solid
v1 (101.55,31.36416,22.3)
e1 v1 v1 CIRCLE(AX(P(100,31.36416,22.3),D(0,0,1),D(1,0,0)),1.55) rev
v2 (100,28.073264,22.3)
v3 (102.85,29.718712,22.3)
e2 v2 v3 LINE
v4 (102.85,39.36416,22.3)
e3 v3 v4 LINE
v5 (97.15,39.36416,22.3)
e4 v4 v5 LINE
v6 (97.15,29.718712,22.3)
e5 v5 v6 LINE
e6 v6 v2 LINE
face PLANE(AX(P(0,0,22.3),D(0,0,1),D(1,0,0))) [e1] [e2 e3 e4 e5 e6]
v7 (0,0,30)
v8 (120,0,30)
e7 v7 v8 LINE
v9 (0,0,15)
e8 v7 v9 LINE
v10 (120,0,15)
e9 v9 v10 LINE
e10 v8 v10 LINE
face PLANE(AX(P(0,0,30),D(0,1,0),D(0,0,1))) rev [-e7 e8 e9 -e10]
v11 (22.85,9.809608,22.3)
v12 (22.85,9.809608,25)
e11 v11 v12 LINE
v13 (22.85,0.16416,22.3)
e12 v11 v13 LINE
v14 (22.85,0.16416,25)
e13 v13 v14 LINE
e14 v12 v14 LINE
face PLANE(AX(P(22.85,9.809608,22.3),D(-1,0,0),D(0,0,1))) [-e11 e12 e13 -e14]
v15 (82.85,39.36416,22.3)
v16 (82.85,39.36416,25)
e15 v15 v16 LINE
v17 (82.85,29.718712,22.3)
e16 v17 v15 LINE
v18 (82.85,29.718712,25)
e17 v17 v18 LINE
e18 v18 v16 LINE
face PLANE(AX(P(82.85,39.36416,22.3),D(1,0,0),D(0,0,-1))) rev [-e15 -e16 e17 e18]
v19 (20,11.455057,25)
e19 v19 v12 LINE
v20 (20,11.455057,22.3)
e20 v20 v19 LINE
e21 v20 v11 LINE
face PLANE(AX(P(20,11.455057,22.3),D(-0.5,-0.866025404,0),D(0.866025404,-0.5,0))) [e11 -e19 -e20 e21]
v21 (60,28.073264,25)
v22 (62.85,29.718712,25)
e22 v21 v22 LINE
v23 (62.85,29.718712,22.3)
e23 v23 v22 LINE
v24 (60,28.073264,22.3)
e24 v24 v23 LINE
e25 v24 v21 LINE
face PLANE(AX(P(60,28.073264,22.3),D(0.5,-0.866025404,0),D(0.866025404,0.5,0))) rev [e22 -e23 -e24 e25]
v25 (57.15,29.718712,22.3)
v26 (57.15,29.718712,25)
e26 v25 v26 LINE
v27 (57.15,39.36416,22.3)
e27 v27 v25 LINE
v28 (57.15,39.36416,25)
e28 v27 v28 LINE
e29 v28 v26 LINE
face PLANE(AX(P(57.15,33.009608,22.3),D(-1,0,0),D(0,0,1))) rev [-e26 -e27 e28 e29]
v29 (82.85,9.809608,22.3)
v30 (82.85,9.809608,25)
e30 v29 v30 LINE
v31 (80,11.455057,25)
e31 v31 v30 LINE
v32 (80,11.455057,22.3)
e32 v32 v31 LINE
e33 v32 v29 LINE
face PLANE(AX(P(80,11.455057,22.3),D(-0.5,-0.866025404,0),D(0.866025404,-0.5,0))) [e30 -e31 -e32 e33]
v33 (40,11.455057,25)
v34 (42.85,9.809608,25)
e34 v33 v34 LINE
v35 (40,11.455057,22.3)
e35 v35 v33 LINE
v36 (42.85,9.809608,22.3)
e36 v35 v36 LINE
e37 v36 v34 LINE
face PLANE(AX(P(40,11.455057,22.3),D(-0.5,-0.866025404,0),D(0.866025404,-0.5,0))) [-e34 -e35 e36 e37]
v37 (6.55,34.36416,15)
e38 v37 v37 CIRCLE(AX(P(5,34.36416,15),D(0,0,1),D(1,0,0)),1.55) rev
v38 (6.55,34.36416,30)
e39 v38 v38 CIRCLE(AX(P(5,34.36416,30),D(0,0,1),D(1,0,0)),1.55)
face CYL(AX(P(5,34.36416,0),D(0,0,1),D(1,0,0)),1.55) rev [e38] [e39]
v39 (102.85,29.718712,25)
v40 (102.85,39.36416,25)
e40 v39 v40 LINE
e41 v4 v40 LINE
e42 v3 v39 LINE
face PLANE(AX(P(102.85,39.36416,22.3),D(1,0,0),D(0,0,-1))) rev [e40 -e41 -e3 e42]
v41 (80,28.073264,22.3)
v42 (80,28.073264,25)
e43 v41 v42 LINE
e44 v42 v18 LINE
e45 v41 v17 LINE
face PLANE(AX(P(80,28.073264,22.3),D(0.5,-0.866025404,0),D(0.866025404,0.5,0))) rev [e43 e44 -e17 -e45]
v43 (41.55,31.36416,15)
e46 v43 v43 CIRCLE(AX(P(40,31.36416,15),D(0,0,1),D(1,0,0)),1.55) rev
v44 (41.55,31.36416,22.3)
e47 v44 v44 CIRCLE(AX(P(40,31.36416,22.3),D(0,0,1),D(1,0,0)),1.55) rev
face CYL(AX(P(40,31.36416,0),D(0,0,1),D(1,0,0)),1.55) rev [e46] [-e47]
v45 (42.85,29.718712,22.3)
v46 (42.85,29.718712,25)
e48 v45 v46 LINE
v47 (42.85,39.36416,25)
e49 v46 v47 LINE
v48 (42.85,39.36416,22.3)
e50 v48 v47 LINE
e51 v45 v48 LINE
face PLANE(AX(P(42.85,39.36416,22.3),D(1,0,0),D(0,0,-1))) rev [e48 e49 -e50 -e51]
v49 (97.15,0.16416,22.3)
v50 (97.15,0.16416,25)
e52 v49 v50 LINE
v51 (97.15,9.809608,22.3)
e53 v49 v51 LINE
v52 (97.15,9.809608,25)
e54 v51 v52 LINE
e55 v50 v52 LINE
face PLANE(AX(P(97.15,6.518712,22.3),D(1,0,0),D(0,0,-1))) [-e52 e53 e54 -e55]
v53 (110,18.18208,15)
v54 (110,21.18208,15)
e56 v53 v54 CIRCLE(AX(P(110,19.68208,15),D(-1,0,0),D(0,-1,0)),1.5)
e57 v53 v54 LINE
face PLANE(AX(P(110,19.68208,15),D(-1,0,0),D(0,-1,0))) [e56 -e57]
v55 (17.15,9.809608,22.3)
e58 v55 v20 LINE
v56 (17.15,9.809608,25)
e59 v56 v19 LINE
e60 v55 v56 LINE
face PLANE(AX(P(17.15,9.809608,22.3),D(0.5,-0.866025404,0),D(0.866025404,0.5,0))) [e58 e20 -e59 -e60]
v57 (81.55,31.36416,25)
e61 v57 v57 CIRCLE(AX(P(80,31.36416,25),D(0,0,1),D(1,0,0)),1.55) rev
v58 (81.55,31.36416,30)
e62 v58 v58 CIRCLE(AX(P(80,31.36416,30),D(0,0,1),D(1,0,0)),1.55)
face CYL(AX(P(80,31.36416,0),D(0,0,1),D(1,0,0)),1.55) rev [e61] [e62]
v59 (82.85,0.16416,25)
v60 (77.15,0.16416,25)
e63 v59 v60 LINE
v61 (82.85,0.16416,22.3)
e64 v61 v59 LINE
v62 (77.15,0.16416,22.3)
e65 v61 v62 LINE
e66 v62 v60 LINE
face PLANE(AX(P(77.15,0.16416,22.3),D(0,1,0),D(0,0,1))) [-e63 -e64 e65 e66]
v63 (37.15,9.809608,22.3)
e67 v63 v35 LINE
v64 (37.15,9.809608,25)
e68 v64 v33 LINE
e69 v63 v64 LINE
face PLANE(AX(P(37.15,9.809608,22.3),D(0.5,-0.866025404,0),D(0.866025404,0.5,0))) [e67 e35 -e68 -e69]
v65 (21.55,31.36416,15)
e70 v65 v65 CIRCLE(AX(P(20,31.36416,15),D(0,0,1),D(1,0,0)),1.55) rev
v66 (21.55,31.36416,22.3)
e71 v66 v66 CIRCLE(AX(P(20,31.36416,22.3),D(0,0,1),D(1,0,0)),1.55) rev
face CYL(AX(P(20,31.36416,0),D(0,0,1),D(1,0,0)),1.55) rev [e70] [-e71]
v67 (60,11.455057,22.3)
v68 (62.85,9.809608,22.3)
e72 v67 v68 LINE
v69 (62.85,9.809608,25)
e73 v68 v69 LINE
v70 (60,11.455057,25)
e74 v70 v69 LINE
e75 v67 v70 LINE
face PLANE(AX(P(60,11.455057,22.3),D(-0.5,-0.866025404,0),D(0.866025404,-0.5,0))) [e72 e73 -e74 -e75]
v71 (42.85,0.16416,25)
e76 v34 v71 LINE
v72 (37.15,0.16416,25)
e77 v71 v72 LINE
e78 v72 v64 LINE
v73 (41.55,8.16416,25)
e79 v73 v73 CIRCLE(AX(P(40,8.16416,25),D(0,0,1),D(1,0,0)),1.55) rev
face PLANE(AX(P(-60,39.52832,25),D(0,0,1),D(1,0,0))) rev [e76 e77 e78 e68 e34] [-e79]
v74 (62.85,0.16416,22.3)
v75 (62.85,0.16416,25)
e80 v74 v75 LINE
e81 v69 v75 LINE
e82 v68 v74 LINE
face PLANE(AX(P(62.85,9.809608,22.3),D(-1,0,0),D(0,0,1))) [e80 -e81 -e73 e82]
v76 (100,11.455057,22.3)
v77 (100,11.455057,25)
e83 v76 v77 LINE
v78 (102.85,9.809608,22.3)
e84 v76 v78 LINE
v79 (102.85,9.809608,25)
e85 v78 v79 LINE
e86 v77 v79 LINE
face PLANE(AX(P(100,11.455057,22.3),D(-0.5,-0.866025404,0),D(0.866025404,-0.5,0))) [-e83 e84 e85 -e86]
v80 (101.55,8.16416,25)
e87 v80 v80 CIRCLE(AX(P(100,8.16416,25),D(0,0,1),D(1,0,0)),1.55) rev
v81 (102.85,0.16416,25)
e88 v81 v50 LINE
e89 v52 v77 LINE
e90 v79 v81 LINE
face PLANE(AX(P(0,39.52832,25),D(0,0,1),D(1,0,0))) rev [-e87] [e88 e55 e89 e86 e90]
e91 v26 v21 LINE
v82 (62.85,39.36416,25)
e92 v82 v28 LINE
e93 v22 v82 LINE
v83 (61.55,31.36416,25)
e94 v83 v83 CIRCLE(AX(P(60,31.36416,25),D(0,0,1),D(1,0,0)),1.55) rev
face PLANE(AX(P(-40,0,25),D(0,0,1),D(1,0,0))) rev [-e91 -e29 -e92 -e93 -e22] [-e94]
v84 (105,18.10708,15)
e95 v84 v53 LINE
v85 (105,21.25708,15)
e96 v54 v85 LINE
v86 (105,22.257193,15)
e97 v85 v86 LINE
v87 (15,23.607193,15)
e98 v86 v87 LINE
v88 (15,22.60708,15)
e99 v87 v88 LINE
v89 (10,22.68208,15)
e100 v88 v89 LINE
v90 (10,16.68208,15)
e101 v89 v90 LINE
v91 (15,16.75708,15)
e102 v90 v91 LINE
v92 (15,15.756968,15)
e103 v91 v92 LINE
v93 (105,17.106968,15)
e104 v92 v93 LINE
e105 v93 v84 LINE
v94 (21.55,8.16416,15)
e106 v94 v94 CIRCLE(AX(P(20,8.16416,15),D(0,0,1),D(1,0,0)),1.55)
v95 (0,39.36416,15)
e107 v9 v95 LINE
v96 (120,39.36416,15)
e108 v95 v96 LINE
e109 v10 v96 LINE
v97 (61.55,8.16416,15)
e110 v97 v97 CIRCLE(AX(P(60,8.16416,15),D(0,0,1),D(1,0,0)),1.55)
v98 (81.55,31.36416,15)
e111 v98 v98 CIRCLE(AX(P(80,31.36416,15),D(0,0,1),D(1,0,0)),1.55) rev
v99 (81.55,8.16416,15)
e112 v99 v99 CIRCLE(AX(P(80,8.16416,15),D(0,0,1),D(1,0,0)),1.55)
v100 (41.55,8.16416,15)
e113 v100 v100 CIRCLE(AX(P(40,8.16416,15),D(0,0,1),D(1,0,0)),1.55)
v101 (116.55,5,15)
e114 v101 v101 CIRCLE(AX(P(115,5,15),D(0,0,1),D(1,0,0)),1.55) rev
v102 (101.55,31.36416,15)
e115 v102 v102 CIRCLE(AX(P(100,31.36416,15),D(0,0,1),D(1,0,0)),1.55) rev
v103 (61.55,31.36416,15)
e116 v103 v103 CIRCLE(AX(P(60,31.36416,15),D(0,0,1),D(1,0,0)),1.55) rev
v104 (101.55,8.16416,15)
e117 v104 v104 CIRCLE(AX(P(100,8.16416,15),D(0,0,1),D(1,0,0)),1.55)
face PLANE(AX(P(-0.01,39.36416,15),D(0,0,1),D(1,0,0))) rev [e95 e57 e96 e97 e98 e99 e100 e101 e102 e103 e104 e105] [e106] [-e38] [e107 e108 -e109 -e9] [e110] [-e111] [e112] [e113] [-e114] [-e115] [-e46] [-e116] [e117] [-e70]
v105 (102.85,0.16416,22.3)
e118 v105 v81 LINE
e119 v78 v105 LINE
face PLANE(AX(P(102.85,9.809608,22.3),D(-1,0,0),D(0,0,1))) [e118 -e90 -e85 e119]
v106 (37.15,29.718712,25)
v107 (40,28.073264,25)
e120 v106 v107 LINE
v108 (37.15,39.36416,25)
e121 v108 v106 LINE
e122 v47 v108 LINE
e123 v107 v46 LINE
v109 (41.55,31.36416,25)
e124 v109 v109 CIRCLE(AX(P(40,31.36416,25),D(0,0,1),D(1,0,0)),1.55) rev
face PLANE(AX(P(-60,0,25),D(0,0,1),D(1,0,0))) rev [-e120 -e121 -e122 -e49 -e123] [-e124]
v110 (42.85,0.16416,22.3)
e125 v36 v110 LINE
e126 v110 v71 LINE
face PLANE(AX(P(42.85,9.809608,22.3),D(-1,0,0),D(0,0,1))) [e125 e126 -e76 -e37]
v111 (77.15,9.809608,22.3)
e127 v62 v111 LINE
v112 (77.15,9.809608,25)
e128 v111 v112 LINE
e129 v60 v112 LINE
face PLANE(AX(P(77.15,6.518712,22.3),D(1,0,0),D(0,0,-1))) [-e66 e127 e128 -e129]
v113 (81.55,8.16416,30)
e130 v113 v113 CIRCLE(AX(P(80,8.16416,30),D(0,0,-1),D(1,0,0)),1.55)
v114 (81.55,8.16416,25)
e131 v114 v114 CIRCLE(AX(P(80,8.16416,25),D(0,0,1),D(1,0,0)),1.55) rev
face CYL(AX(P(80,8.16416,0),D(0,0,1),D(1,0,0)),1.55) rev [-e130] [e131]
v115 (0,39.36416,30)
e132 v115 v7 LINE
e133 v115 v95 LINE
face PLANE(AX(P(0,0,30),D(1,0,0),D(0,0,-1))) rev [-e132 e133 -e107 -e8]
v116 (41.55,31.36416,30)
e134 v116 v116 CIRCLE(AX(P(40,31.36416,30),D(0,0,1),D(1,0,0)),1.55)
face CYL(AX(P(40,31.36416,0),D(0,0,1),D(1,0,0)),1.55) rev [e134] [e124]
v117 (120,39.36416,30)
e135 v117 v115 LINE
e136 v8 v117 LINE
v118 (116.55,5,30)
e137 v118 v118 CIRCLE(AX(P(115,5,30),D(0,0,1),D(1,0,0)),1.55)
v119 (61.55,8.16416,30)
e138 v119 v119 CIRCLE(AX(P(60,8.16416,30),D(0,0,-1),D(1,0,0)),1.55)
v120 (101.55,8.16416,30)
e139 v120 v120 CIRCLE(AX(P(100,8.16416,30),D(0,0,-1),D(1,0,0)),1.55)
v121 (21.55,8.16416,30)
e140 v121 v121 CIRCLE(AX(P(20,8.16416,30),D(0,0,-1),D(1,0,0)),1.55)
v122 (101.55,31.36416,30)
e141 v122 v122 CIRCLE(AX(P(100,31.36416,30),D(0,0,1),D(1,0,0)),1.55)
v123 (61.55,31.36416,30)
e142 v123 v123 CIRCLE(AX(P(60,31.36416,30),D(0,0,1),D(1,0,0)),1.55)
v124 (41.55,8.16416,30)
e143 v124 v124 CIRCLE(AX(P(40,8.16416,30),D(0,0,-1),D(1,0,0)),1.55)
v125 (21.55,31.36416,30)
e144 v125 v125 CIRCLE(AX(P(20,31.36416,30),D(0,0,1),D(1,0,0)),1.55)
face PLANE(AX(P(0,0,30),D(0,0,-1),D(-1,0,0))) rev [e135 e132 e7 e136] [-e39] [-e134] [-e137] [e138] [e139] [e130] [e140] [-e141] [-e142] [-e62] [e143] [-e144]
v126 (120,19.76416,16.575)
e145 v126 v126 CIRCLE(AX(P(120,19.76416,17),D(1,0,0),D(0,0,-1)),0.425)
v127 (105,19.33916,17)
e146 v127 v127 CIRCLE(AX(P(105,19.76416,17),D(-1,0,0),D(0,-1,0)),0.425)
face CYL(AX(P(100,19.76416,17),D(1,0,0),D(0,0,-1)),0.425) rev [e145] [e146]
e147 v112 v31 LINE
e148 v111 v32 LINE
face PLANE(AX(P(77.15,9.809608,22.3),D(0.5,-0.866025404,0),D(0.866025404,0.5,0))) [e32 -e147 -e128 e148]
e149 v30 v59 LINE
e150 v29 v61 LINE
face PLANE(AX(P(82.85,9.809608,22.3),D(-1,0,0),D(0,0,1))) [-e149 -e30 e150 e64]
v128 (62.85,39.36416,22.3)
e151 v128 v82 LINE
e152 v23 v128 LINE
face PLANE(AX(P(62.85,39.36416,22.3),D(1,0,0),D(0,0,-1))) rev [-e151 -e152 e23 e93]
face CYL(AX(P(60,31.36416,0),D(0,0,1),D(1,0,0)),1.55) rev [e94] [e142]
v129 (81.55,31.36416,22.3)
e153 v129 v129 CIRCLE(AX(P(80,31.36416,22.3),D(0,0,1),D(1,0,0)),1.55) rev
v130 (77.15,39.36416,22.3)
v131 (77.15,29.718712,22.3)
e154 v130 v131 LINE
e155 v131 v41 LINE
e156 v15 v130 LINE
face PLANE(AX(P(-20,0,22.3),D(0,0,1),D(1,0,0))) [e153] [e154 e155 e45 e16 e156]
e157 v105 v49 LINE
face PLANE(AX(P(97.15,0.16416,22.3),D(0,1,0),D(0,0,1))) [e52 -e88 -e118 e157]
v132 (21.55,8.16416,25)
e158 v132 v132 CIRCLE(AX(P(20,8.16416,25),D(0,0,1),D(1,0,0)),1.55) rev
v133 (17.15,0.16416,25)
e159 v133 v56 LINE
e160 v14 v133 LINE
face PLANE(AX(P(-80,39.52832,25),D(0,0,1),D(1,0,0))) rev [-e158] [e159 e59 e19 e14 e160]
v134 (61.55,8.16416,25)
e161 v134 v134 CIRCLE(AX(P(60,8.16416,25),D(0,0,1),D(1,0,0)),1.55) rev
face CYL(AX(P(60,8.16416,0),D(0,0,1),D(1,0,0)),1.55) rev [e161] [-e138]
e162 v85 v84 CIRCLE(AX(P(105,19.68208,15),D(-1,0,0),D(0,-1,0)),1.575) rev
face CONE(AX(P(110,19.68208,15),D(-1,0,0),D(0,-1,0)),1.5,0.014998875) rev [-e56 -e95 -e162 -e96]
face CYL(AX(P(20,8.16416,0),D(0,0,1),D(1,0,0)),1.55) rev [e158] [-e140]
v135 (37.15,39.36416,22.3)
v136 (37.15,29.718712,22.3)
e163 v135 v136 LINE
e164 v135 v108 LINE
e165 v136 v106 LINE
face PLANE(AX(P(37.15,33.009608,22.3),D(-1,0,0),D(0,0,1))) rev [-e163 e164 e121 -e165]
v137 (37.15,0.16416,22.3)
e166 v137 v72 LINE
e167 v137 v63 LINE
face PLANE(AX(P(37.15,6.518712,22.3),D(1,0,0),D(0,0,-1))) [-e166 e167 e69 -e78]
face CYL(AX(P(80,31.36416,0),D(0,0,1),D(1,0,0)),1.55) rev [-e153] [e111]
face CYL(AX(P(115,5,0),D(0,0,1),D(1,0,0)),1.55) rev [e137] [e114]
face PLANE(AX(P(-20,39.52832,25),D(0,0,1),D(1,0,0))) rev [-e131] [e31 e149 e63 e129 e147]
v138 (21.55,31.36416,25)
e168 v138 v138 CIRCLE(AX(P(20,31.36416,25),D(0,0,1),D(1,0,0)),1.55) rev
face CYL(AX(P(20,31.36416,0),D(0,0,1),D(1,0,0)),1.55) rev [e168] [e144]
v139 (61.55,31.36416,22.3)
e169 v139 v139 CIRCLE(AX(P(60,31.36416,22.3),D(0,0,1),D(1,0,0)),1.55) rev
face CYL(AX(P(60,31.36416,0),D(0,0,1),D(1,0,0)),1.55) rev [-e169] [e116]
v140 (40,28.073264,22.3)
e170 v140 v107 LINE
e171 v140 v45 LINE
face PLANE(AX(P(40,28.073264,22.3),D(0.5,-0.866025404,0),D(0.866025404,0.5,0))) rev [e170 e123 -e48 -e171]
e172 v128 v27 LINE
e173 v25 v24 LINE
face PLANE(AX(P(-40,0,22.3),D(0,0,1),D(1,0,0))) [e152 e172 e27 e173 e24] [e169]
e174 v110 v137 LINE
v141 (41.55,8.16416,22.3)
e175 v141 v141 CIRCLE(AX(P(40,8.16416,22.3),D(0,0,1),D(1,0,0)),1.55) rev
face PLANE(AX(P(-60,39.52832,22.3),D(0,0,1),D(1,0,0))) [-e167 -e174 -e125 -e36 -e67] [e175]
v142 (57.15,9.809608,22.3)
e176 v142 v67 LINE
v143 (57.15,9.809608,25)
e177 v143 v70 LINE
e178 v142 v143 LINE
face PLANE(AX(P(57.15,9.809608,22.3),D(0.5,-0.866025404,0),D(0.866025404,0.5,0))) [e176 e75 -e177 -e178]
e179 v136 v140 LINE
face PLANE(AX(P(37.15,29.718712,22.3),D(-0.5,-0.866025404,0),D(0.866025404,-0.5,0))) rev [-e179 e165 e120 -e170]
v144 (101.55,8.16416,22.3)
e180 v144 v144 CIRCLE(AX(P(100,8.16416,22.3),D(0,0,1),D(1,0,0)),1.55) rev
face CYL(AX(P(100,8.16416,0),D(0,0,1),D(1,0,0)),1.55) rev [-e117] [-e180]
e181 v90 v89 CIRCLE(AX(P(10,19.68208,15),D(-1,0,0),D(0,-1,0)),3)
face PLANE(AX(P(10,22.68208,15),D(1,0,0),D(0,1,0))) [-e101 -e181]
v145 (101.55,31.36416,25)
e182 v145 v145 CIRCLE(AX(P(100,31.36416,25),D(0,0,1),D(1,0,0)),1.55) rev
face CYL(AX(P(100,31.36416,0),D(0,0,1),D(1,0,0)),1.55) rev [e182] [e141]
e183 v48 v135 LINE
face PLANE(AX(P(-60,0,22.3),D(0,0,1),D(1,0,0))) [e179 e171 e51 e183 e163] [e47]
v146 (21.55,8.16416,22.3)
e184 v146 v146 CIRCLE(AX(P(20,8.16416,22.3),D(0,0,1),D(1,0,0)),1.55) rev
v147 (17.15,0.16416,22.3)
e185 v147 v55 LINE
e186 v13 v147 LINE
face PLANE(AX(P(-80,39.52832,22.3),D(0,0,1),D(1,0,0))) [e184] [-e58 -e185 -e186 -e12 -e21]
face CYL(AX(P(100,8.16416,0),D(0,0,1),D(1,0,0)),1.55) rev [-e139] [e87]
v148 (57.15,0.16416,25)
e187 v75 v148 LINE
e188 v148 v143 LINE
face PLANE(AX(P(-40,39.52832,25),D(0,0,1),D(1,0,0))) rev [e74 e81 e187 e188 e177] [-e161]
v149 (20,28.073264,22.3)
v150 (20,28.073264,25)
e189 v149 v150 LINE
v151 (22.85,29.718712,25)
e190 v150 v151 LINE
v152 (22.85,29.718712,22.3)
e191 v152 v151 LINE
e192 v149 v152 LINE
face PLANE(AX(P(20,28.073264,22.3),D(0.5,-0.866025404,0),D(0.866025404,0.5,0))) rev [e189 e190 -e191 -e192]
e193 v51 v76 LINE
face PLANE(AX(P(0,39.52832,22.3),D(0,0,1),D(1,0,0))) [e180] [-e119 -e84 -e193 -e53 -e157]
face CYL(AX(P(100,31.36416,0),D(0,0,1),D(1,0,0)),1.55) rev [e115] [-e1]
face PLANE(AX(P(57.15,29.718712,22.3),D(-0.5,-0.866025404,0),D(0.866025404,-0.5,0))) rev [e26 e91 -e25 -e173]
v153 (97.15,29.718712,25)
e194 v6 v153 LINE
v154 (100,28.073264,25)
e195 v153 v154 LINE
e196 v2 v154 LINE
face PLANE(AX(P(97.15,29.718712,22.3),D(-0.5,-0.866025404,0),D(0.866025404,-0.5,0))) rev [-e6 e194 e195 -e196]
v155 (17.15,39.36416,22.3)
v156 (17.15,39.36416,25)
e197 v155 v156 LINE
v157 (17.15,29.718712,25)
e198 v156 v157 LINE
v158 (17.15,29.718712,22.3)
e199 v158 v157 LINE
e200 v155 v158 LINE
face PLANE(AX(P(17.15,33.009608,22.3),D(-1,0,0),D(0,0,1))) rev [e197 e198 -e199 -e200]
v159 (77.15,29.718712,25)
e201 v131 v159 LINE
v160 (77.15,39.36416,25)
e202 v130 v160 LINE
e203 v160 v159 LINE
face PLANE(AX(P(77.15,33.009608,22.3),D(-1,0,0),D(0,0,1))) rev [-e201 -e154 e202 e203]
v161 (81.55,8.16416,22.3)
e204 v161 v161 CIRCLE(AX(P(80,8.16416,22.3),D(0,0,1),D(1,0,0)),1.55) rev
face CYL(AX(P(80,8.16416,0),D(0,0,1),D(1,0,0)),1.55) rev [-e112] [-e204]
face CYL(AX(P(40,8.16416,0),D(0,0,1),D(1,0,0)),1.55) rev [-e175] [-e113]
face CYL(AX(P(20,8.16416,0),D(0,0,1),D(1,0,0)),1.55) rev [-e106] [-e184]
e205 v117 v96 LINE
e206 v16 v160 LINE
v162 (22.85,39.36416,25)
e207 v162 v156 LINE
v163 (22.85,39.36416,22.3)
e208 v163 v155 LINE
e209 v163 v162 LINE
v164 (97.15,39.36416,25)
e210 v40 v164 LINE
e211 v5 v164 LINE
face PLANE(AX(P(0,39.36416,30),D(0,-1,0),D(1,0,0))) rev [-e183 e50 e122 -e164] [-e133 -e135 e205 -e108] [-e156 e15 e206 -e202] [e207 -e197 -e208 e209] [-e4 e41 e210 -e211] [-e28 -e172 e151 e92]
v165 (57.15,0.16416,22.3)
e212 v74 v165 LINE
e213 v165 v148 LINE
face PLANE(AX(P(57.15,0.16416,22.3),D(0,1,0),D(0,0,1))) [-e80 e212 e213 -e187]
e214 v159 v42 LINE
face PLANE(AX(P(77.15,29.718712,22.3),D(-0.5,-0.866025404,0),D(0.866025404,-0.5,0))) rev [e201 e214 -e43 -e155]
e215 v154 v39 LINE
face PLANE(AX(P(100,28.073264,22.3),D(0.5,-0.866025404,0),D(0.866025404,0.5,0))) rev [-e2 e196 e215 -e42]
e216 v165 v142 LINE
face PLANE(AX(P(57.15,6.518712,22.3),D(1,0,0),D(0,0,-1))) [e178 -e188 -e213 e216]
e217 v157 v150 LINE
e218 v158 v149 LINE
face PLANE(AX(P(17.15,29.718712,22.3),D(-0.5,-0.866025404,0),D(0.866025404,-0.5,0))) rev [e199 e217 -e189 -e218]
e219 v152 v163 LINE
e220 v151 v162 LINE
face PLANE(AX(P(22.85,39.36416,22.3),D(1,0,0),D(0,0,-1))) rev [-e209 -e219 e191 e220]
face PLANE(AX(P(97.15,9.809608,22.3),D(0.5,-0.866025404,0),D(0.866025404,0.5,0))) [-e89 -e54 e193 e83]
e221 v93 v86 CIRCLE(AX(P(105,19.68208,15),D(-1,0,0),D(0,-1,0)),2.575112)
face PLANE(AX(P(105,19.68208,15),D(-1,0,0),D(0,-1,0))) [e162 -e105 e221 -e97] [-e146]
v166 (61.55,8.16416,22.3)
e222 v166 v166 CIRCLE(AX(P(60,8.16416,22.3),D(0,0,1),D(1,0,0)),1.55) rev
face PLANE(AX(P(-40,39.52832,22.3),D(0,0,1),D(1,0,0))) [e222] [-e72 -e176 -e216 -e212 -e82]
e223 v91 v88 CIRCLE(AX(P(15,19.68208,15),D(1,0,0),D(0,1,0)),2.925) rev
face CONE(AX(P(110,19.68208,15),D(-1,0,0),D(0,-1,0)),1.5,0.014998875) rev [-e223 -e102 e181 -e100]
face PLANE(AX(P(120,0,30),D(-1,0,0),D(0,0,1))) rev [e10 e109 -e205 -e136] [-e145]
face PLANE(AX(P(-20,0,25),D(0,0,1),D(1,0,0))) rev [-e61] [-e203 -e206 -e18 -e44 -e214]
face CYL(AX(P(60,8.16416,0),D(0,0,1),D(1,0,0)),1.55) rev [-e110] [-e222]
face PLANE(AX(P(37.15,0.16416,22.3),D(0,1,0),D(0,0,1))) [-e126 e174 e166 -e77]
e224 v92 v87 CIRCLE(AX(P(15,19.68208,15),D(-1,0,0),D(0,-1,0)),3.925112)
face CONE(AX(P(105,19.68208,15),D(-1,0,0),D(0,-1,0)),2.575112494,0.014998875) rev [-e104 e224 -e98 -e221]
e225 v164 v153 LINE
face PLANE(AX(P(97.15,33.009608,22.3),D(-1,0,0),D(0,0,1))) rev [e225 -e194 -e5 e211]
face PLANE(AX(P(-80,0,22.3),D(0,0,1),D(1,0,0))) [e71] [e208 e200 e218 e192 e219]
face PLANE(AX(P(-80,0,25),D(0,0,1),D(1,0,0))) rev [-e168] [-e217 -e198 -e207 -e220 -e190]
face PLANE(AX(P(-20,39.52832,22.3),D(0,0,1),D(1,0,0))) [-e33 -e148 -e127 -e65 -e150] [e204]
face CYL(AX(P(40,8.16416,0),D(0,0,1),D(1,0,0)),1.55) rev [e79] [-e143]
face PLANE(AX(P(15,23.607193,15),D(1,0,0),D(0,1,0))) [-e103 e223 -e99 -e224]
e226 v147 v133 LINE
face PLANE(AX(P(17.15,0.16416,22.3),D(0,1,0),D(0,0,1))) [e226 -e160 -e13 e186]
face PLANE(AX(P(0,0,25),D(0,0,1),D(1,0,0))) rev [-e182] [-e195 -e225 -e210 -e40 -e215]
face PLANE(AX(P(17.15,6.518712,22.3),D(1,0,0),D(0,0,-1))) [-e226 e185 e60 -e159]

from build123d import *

# Parameters (mm, degrees)
SKIZZE2_W                        = 120
SKIZZE2_H                        = 39.364160046
AUFSATZ_LINEAR_AUSTRAGEN1_DEPTH  = 30
SKIZZE24_R                       = 1.55
SCHNITT_LINEAR_AUSTRAGEN4_DEPTH  = 130.805766806
SKIZZE46_R                       = 2.85
SCHNITT_LINEAR_AUSTRAGEN15_DEPTH = 10
SCHNITT_LINEAR_START             = -5
SCHNITT_LINEAR_AUSTRAGEN25_DEPTH = 2.7
LINEARES_MUSTER1_COUNT           = 5
LINEARES_MUSTER1_PITCH           = 20
SPIEGELN2_COPY_1_SKETCH_R        = 2.85
SPIEGELN2_COPY_1_DEPTH           = 10
SPIEGELN2_COPY_2_SKETCH_R        = 2.85
SPIEGELN2_COPY_2_DEPTH           = 10
SPIEGELN2_COPY_3_SKETCH_R        = 2.85
SPIEGELN2_COPY_3_DEPTH           = 10
SPIEGELN2_COPY_4_SKETCH_R        = 2.85
SPIEGELN2_COPY_4_DEPTH           = 10
SPIEGELN2_START                  = -5
SPIEGELN2_COPY_5_DEPTH           = 2.7
SPIEGELN2_COPY_6_DEPTH           = 2.7
SPIEGELN2_COPY_7_DEPTH           = 2.7
SPIEGELN2_COPY_8_DEPTH           = 2.7
SKIZZE51_R                       = 1.55
SCHNITT_LINEAR_AUSTRAGEN26_DEPTH = 130.805766806
SKIZZE67_R                       = 0.425
SCHNITT_LINEAR_AUSTRAGEN30_DEPTH = 20
SKIZZE70_R                       = 0.5
SCHNITT_LINEAR_AUSTRAGEN37_DEPTH = 16
SKIZZE71_R                       = 2
SCHNITT_LINEAR_AUSTRAGEN38_DEPTH = 6
ABSPALTEN3_OUTLINE_W             = 120
ABSPALTEN3_OUTLINE_H             = 39.364160046
ABSPALTEN3_OUTLINE_R             = 1.55
ABSPALTEN3_DEPTH                 = 15


# Read off the part's stored shape, not the designer's step: Abspalten3
with BuildPart() as part:
    # Skizze2 → Aufsatz-Linear austragen1 (new body)
    with BuildSketch(Plane.XY):
        with Locations((60, 19.682080023)):
            Rectangle(SKIZZE2_W, SKIZZE2_H)
    extrude(amount=AUFSATZ_LINEAR_AUSTRAGEN1_DEPTH)

    # Skizze24 → Schnitt-Linear austragen4 (cut, through all)
    with BuildSketch(Plane.XY.offset(30)):
        with Locations((20, 31.364160046)):
            Circle(SKIZZE24_R)
        with Locations((40, 31.364160046)):
            Circle(SKIZZE24_R)
        with Locations((60, 31.364160046)):
            Circle(SKIZZE24_R)
        with Locations((80, 31.364160046)):
            Circle(SKIZZE24_R)
        with Locations((100, 31.364160046)):
            Circle(SKIZZE24_R)
    schnitt_linear_austragen4 = extrude(amount=-SCHNITT_LINEAR_AUSTRAGEN4_DEPTH, mode=Mode.SUBTRACT)

    # Skizze46 → Schnitt-Linear austragen15 (cut)
    with BuildSketch(Plane(origin=(0, 0, 0), x_dir=(-1, 0, 0), z_dir=(0, 0, -1))):
        with Locations((-100, 31.364160046)):
            Circle(SKIZZE46_R)
    schnitt_linear_austragen15 = extrude(amount=-SCHNITT_LINEAR_AUSTRAGEN15_DEPTH, mode=Mode.SUBTRACT)

    # Skizze50 → Schnitt-Linear austragen25 (cut)
    with BuildSketch(Plane.XY.offset(30).offset(SCHNITT_LINEAR_START)):
        Polygon((97.15, 33.009608314), (97.15, 39.364160046), (102.85, 39.364160046), (102.85, 33.009608314), (102.85, 29.718711779), (100, 28.073263512), (97.15, 29.718711779), align=None)
    schnitt_linear_austragen25 = extrude(amount=-SCHNITT_LINEAR_AUSTRAGEN25_DEPTH, mode=Mode.SUBTRACT)

    # Lineares Muster1: Schnitt-Linear austragen15, Schnitt-Linear austragen25 ×5
    with Locations(*[(-i * LINEARES_MUSTER1_PITCH, 0, 0) for i in range(1, LINEARES_MUSTER1_COUNT)]):
        add(schnitt_linear_austragen15, mode=Mode.SUBTRACT)
        add(schnitt_linear_austragen25, mode=Mode.SUBTRACT)

    # Spiegeln2: Schnitt-Linear austragen15, Schnitt-Linear austragen25 across plane
    add(schnitt_linear_austragen15.mirror(Plane.ZX.offset(19.764160046)), mode=Mode.SUBTRACT)
    add(schnitt_linear_austragen25.mirror(Plane.ZX.offset(19.764160046)), mode=Mode.SUBTRACT)

    # Spiegeln2 copy 1 sketch → Spiegeln2 copy 1 (cut)
    with BuildSketch(Plane(origin=(-20, 39.528320093, 0), x_dir=(-1, 0, 0), z_dir=(0, 0, -1))):
        with Locations((-100, -31.364160046)):
            Circle(SPIEGELN2_COPY_1_SKETCH_R)
    extrude(amount=-SPIEGELN2_COPY_1_DEPTH, mode=Mode.SUBTRACT)

    # Spiegeln2 copy 2 sketch → Spiegeln2 copy 2 (cut)
    with BuildSketch(Plane(origin=(-40, 39.528320093, 0), x_dir=(-1, 0, 0), z_dir=(0, 0, -1))):
        with Locations((-100, -31.364160046)):
            Circle(SPIEGELN2_COPY_2_SKETCH_R)
    extrude(amount=-SPIEGELN2_COPY_2_DEPTH, mode=Mode.SUBTRACT)

    # Spiegeln2 copy 3 sketch → Spiegeln2 copy 3 (cut)
    with BuildSketch(Plane(origin=(-60, 39.528320093, 0), x_dir=(-1, 0, 0), z_dir=(0, 0, -1))):
        with Locations((-100, -31.364160046)):
            Circle(SPIEGELN2_COPY_3_SKETCH_R)
    extrude(amount=-SPIEGELN2_COPY_3_DEPTH, mode=Mode.SUBTRACT)

    # Spiegeln2 copy 4 sketch → Spiegeln2 copy 4 (cut)
    with BuildSketch(Plane(origin=(-80, 39.528320093, 0), x_dir=(-1, 0, 0), z_dir=(0, 0, -1))):
        with Locations((-100, -31.364160046)):
            Circle(SPIEGELN2_COPY_4_SKETCH_R)
    extrude(amount=-SPIEGELN2_COPY_4_DEPTH, mode=Mode.SUBTRACT)

    # Spiegeln2 copy 5 sketch → Spiegeln2 copy 5 (cut)
    with BuildSketch(Plane(origin=(-20, 39.528320093, 30), x_dir=(1, 0, 0), z_dir=(0, 0, 1)).offset(SPIEGELN2_START)):
        Polygon((97.15, -33.009608314), (97.15, -39.364160046), (102.85, -39.364160046), (102.85, -33.009608314), (102.85, -29.718711779), (100, -28.073263512), (97.15, -29.718711779), align=None)
    extrude(amount=-SPIEGELN2_COPY_5_DEPTH, mode=Mode.SUBTRACT)

    # Spiegeln2 copy 6 sketch → Spiegeln2 copy 6 (cut)
    with BuildSketch(Plane(origin=(-40, 39.528320093, 30), x_dir=(1, 0, 0), z_dir=(0, 0, 1)).offset(SPIEGELN2_START)):
        Polygon((97.15, -33.009608314), (97.15, -39.364160046), (102.85, -39.364160046), (102.85, -33.009608314), (102.85, -29.718711779), (100, -28.073263512), (97.15, -29.718711779), align=None)
    extrude(amount=-SPIEGELN2_COPY_6_DEPTH, mode=Mode.SUBTRACT)

    # Spiegeln2 copy 7 sketch → Spiegeln2 copy 7 (cut)
    with BuildSketch(Plane(origin=(-60, 39.528320093, 30), x_dir=(1, 0, 0), z_dir=(0, 0, 1)).offset(SPIEGELN2_START)):
        Polygon((97.15, -33.009608314), (97.15, -39.364160046), (102.85, -39.364160046), (102.85, -33.009608314), (102.85, -29.718711779), (100, -28.073263512), (97.15, -29.718711779), align=None)
    extrude(amount=-SPIEGELN2_COPY_7_DEPTH, mode=Mode.SUBTRACT)

    # Spiegeln2 copy 8 sketch → Spiegeln2 copy 8 (cut)
    with BuildSketch(Plane(origin=(-80, 39.528320093, 30), x_dir=(1, 0, 0), z_dir=(0, 0, 1)).offset(SPIEGELN2_START)):
        Polygon((97.15, -33.009608314), (97.15, -39.364160046), (102.85, -39.364160046), (102.85, -33.009608314), (102.85, -29.718711779), (100, -28.073263512), (97.15, -29.718711779), align=None)
    extrude(amount=-SPIEGELN2_COPY_8_DEPTH, mode=Mode.SUBTRACT)

    # Spiegeln3: Schnitt-Linear austragen4 across plane
    add(schnitt_linear_austragen4.mirror(Plane.ZX.offset(19.764160046)), mode=Mode.SUBTRACT)

    # Skizze51 → Schnitt-Linear austragen26 (cut, through all)
    with BuildSketch(Plane.XY.offset(30)):
        with Locations((5, 34.364160046)):
            Circle(SKIZZE51_R)
        with Locations((115, 5)):
            Circle(SKIZZE51_R)
    extrude(amount=-SCHNITT_LINEAR_AUSTRAGEN26_DEPTH, mode=Mode.SUBTRACT)

    # Skizze66 → Schnitt-Rotation5 (revolve, cut)
    with BuildSketch(Plane.XY.offset(15), mode=Mode.PRIVATE) as schnitt_rotation5_sk:
        Polygon((110, 19.682080023), (110, 21.182080023), (10, 22.682080023), (10, 19.682080023), align=None)
        Polygon((105, 19.682080023), (105, 22.257192517), (15, 23.607192517), (15, 19.682080023), align=None)
    revolve(schnitt_rotation5_sk.sketch.rotate(Axis((10, 19.682080023, 15), (1, 0, 0)), 180), axis=Axis((10, 19.682080023, 15), (1, 0, 0)), mode=Mode.SUBTRACT)

    # Skizze67 → Schnitt-Linear austragen30 (cut)
    with BuildSketch(Plane(origin=(120, 0, 0), x_dir=(0, 0, -1), z_dir=(1, 0, 0))):
        with Locations((-17, 19.764160046)):
            Circle(SKIZZE67_R)
    schnitt_linear_austragen30 = extrude(amount=-SCHNITT_LINEAR_AUSTRAGEN30_DEPTH, mode=Mode.SUBTRACT)

    # Spiegeln7: Schnitt-Linear austragen30 across plane
    add(schnitt_linear_austragen30.mirror(Plane.XY.offset(15)), mode=Mode.SUBTRACT)

    # Skizze70 → Schnitt-Linear austragen37 (cut)
    with BuildSketch(Plane.ZY):
        with Locations((11.58373564, 19.764160046)):
            Circle(SKIZZE70_R)
    extrude(amount=-SCHNITT_LINEAR_AUSTRAGEN37_DEPTH, mode=Mode.SUBTRACT)

    # Skizze71 → Schnitt-Linear austragen38 (cut)
    with BuildSketch(Plane.ZY):
        with Locations((11.58373564, 19.764160046)):
            Circle(SKIZZE71_R)
    extrude(amount=-SCHNITT_LINEAR_AUSTRAGEN38_DEPTH, mode=Mode.SUBTRACT)

    # Abspalten3 outline → Abspalten3 (cut)
    with BuildSketch(Plane.XY):
        with Locations((60, 19.682080023)):
            Rectangle(ABSPALTEN3_OUTLINE_W, ABSPALTEN3_OUTLINE_H)
        with Locations((115, 5)):
            Circle(ABSPALTEN3_OUTLINE_R, mode=Mode.SUBTRACT)
        with Locations((5, 34.364160046)):
            Circle(ABSPALTEN3_OUTLINE_R, mode=Mode.SUBTRACT)
        with Locations((20, 8.164160046)):
            Circle(ABSPALTEN3_OUTLINE_R, mode=Mode.SUBTRACT)
        with Locations((40, 8.164160046)):
            Circle(ABSPALTEN3_OUTLINE_R, mode=Mode.SUBTRACT)
        with Locations((60, 8.164160046)):
            Circle(ABSPALTEN3_OUTLINE_R, mode=Mode.SUBTRACT)
        with Locations((80, 8.164160046)):
            Circle(ABSPALTEN3_OUTLINE_R, mode=Mode.SUBTRACT)
        with Locations((100, 8.164160046)):
            Circle(ABSPALTEN3_OUTLINE_R, mode=Mode.SUBTRACT)
        with Locations((20, 31.364160046)):
            Circle(ABSPALTEN3_OUTLINE_R, mode=Mode.SUBTRACT)
        with Locations((40, 31.364160046)):
            Circle(ABSPALTEN3_OUTLINE_R, mode=Mode.SUBTRACT)
        with Locations((60, 31.364160046)):
            Circle(ABSPALTEN3_OUTLINE_R, mode=Mode.SUBTRACT)
        with Locations((80, 31.364160046)):
            Circle(ABSPALTEN3_OUTLINE_R, mode=Mode.SUBTRACT)
        with Locations((100, 31.364160046)):
            Circle(ABSPALTEN3_OUTLINE_R, mode=Mode.SUBTRACT)
    extrude(amount=ABSPALTEN3_DEPTH, mode=Mode.SUBTRACT)


solid = part.part
